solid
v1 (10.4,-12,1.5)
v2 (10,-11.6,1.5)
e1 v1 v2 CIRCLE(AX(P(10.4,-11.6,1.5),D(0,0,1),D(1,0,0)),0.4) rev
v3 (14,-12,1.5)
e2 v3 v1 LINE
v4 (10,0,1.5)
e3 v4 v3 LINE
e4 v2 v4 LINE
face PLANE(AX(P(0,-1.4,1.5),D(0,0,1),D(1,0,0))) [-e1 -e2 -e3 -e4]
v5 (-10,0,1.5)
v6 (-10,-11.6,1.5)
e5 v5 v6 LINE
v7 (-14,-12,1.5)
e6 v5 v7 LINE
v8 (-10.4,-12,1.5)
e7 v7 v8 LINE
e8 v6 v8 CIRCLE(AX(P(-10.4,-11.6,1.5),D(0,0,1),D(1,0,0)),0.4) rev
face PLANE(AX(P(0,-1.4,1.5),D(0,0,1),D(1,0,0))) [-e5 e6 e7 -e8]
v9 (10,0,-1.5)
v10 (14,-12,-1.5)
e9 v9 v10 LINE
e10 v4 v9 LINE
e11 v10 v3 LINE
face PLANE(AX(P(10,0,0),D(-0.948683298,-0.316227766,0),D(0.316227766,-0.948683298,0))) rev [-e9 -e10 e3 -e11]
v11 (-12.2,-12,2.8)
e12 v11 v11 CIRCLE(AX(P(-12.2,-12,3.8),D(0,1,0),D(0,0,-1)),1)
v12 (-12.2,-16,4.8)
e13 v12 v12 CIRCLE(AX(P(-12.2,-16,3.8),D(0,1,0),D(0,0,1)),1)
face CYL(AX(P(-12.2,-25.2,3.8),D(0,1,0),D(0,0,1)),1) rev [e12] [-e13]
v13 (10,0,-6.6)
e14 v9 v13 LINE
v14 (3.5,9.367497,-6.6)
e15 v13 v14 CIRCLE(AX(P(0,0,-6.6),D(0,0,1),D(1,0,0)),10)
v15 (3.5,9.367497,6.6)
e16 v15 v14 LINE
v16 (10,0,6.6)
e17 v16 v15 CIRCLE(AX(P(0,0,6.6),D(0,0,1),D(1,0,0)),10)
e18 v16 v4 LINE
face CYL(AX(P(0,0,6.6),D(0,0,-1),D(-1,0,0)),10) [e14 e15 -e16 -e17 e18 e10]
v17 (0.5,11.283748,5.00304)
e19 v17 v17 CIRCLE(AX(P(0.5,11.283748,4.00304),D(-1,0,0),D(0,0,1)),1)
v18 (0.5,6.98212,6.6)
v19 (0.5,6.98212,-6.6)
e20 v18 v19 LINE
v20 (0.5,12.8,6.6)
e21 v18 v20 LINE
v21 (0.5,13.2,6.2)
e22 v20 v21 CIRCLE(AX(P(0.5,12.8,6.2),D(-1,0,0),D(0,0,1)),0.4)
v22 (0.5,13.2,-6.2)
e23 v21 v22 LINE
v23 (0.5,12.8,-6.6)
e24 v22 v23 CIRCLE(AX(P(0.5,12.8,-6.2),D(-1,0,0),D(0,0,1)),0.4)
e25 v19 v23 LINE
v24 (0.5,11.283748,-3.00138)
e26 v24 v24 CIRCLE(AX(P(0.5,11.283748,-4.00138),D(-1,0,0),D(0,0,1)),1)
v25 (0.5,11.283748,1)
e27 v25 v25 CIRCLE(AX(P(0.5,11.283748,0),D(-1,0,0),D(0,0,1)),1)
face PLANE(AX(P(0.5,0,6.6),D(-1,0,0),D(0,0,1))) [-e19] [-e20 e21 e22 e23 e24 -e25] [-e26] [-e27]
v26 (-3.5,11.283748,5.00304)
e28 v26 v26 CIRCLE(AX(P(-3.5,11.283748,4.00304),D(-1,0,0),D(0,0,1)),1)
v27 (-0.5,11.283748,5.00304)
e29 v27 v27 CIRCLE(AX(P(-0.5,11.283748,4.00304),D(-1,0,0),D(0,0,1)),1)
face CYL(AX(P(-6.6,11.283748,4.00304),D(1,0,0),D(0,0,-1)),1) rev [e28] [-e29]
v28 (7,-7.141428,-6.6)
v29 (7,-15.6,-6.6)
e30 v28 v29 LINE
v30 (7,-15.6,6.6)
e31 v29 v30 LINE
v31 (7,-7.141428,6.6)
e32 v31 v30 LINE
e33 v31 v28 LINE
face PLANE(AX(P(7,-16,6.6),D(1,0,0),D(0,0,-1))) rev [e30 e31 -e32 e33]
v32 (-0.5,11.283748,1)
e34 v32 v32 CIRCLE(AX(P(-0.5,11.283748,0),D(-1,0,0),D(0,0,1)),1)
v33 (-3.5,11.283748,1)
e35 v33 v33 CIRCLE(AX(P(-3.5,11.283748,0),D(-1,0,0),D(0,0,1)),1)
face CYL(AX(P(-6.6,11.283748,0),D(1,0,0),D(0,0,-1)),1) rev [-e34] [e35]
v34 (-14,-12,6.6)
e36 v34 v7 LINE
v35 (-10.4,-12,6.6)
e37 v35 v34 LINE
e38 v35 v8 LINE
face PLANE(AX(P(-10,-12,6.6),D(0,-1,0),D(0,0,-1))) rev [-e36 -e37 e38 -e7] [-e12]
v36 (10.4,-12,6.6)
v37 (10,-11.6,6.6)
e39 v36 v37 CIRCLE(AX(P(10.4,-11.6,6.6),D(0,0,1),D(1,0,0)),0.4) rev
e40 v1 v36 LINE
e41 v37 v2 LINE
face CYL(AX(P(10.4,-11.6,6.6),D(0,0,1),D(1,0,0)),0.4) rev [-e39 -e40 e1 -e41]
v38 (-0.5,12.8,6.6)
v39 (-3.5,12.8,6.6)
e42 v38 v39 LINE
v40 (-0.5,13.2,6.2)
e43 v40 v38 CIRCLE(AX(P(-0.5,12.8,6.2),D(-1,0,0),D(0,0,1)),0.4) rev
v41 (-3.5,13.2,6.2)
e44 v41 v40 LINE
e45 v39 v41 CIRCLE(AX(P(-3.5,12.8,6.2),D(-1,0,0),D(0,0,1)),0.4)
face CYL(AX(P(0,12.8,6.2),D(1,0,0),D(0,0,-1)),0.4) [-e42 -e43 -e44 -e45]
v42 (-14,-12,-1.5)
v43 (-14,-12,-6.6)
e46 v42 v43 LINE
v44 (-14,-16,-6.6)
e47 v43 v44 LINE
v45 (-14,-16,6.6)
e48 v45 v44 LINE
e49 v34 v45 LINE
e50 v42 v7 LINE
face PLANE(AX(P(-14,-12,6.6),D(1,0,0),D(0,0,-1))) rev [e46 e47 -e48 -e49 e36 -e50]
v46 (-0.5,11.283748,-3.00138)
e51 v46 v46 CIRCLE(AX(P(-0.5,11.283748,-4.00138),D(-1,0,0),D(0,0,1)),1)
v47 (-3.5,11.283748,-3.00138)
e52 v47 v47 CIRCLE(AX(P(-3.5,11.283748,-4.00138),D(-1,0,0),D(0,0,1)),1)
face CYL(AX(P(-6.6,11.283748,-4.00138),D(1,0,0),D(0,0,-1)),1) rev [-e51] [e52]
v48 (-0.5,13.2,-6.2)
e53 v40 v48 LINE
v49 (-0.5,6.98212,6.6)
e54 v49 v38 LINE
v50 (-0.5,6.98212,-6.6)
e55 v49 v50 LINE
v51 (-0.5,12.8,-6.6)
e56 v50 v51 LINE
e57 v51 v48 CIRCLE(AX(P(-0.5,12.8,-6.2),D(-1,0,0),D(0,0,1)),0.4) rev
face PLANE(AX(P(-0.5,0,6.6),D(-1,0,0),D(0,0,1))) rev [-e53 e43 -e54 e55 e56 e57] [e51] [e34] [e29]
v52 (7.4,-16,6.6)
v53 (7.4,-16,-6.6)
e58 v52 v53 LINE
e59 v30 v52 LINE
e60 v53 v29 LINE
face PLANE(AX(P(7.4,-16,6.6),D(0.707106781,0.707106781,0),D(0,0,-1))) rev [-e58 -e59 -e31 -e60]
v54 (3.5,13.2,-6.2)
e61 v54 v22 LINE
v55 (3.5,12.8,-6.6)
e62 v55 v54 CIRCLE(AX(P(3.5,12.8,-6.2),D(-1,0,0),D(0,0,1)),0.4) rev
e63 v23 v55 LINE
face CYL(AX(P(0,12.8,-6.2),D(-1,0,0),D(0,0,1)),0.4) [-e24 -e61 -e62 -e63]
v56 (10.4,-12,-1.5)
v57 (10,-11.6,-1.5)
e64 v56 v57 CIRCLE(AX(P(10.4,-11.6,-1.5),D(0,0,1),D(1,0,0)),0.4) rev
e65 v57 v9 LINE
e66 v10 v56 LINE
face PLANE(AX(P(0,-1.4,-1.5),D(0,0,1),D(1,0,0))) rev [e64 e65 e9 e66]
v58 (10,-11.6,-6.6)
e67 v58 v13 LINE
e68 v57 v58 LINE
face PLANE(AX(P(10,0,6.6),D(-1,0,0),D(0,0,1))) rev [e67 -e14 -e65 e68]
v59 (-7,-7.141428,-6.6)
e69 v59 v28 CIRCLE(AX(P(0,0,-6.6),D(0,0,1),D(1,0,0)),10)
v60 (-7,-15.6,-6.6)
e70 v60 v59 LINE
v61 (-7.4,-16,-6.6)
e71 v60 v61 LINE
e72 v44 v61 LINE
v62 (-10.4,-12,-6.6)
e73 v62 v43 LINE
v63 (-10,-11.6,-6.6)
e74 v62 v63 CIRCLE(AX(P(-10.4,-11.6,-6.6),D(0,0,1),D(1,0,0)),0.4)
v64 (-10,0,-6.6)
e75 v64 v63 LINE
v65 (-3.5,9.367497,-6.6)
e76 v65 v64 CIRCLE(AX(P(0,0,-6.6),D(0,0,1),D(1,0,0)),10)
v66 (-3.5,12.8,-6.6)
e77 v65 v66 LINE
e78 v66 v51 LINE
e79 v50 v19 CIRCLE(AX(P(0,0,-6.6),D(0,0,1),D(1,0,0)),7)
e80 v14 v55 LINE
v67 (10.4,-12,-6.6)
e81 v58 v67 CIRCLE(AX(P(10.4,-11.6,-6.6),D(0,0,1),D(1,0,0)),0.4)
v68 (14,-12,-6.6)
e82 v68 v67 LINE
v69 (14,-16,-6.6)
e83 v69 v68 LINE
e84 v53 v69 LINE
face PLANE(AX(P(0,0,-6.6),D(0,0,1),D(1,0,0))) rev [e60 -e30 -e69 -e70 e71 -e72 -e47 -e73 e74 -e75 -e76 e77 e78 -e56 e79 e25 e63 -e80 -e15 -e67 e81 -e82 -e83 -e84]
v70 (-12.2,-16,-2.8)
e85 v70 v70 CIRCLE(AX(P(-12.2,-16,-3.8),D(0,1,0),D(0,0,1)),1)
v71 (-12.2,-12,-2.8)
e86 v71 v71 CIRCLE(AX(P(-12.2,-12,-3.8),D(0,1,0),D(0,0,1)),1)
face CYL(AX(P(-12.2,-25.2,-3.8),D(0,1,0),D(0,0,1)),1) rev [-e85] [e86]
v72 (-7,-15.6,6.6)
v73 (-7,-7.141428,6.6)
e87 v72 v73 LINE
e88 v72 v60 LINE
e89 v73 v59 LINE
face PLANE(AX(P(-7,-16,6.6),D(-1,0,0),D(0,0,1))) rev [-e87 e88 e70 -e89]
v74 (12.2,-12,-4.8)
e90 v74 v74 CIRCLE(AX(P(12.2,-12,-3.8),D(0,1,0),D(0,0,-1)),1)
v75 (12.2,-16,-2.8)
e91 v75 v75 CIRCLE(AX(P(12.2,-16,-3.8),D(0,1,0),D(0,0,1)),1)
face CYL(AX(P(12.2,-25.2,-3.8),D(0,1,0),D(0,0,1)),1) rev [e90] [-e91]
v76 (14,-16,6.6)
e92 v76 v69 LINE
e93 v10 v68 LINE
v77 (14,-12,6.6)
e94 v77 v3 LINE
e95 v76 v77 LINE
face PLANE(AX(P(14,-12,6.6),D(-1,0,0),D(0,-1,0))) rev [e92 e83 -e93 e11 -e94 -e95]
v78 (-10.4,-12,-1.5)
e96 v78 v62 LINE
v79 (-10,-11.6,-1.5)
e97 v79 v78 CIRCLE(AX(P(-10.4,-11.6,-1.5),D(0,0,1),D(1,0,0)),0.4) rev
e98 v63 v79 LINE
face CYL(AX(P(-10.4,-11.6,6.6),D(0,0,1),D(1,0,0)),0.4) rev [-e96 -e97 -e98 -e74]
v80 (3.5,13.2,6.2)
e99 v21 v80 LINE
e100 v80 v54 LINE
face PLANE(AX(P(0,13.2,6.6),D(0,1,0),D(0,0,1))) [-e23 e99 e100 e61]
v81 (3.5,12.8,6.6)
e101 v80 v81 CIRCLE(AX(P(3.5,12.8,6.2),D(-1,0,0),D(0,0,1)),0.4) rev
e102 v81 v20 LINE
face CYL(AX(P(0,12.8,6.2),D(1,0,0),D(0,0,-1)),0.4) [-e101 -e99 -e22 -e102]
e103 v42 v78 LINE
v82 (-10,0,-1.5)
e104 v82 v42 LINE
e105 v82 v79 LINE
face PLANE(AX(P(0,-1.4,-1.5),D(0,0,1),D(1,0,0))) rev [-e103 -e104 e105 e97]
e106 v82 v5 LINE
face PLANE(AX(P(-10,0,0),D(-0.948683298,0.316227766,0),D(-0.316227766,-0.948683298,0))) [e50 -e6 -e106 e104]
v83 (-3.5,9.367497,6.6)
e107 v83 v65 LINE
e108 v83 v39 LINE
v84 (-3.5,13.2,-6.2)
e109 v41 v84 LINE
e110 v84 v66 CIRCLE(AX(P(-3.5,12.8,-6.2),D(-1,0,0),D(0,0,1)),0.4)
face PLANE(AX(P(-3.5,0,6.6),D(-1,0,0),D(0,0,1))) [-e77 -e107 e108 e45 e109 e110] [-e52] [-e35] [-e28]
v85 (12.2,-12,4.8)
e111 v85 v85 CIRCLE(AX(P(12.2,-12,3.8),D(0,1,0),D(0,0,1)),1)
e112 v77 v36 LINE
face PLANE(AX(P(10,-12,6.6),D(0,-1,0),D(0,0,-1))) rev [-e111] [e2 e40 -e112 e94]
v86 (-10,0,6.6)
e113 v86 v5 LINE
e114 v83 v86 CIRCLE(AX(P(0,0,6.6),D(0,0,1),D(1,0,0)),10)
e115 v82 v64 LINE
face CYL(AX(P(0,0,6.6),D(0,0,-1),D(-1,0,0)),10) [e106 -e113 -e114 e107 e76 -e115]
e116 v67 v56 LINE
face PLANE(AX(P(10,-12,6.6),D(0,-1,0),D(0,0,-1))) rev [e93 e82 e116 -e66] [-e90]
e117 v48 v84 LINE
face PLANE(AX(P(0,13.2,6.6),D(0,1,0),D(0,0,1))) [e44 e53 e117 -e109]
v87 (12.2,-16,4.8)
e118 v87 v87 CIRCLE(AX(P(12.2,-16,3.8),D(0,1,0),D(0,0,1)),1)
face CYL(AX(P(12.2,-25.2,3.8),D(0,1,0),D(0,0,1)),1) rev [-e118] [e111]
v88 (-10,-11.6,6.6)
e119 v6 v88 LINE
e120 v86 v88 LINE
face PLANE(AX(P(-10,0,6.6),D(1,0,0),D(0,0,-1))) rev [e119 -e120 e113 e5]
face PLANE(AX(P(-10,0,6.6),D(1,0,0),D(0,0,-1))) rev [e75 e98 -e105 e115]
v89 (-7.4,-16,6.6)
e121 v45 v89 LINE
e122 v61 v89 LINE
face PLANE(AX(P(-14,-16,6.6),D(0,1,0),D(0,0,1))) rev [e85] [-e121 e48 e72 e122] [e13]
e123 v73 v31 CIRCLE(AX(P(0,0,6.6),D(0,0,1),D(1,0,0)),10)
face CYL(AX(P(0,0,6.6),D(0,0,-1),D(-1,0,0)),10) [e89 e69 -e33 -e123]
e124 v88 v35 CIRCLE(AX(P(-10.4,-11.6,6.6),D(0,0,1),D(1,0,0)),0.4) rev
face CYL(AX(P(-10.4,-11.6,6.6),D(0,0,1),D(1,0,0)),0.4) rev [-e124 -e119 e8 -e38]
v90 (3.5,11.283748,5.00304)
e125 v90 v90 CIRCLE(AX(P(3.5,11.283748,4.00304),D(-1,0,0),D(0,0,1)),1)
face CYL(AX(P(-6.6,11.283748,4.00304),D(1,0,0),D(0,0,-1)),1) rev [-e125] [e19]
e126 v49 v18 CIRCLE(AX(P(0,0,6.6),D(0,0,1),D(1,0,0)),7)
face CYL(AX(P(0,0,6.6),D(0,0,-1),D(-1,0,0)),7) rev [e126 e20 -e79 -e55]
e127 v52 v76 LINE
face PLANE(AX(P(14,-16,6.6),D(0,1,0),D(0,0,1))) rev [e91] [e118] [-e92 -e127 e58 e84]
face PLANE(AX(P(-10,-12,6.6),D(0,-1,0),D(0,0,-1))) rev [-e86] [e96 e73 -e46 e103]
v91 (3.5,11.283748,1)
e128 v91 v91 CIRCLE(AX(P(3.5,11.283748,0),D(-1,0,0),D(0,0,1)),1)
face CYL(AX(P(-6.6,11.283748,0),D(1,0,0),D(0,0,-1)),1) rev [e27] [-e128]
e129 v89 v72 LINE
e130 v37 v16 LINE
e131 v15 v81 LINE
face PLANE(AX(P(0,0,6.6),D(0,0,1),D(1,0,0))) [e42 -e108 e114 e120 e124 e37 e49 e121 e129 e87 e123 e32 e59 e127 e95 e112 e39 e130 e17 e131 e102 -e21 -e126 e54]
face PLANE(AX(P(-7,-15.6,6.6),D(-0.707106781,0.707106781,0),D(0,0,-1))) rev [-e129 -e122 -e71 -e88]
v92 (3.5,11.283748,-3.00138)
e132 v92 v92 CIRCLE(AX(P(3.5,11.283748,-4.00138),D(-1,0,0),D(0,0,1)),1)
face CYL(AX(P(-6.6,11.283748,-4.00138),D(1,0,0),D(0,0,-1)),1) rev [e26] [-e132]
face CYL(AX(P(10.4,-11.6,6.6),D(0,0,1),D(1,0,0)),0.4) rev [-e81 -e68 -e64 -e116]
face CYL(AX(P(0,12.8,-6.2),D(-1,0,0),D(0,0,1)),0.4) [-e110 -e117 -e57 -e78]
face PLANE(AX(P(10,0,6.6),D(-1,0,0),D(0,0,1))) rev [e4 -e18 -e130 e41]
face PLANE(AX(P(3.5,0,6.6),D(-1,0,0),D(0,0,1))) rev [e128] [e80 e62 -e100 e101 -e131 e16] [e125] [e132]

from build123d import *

# Parameters (mm, degrees)
BOSS_EXTRUDE1_DEPTH = 6.6
SKETCH3_R           = 1
CUT_EXTRUDE1_DEPTH  = 6.6
BOSS_EXTRUDE2_DEPTH = 6.6
CHAMFER1_SIZE       = 0.4
FILLET1_R           = 0.4
FILLET2_R           = 0.4
RIB17_START         = -1.5
RIB17_DEPTH         = 3
SKETCH25_R          = 1
CUT_EXTRUDE2_DEPTH  = 13.2


# Read off the part's stored shape, not the designer's step: Rib17
with BuildPart() as part:
    # Sketch1 → Boss-Extrude1 (new, symmetric)
    with BuildSketch(Plane.XY):
        with BuildLine():
            Line((-0.5, 13.2), (-3.5, 13.2))
            Line((-3.5, 13.2), (-3.5, 9.367496998))
            ThreePointArc((-3.5, 9.367496998), (0, -10), (3.5, 9.367496998))
            Line((3.5, 9.367496998), (3.5, 13.2))
            Line((3.5, 13.2), (0.5, 13.2))
            Line((0.5, 13.2), (0.5, 6.982120022))
            ThreePointArc((0.5, 6.982120022), (5.123475383, 4.769696007), (7, 0))
            ThreePointArc((7, 0), (-4.769696007, -5.123475383), (-0.5, 6.982120022))
            Line((-0.5, 6.982120022), (-0.5, 13.2))
        make_face()
    extrude(amount=BOSS_EXTRUDE1_DEPTH, both=True)

    # Sketch3 → Cut-Extrude1 (cut, symmetric)
    with BuildSketch(Plane(origin=(0, 0, 0), x_dir=(0, 0, -1), z_dir=(1, 0, 0))):
        with Locations(Location((0, 11.283748499, 0), (0, 0, 180))):
            Circle(SKETCH3_R)
        with Locations(Location((4.001379793, 11.283748499, 0), (0, 0, 180))):
            Circle(SKETCH3_R)
        with Locations(Location((-4.00303992, 11.283748499, 0), (0, 0, 180))):
            Circle(SKETCH3_R)
    extrude(amount=CUT_EXTRUDE1_DEPTH, both=True, mode=Mode.SUBTRACT)

    # Sketch4 → Boss-Extrude2 (add, symmetric)
    with BuildSketch(Plane.XY):
        with BuildLine():
            Line((-10, 0), (-10, -12))
            Line((-10, -12), (-14, -12))
            Line((-14, -12), (-14, -16))
            Line((-14, -16), (-7, -16))
            Line((-7, -16), (-7, -7.141428429))
            ThreePointArc((-7, -7.141428429), (-9.219544457, -3.872983346), (-10, 0))
        make_face()
        with BuildLine():
            Line((10, 0), (10, -12))
            Line((10, -12), (14, -12))
            Line((14, -12), (14, -16))
            Line((14, -16), (7, -16))
            Line((7, -16), (7, -7.141428429))
            ThreePointArc((7, -7.141428429), (9.219544457, -3.872983346), (10, 0))
        make_face()
    extrude(amount=BOSS_EXTRUDE2_DEPTH, both=True)

    # Chamfer1
    chamfer1_edges = [part.edges().sort_by_distance(p)[0] for p in [
        (-7, -16, 0),
        (7, -16, 0),
    ]]
    chamfer(chamfer1_edges, length=CHAMFER1_SIZE)

    # Fillet1
    fillet1_edges = [part.edges().sort_by_distance(p)[0] for p in [
        (-10, -12, 0),
        (10, -12, 0),
    ]]
    fillet(fillet1_edges, radius=FILLET1_R)

    # Fillet2
    fillet2_edges = [part.edges().sort_by_distance(p)[0] for p in [
        (2, 13.2, -6.6),
        (-2, 13.2, -6.6),
        (-2, 13.2, 6.6),
        (2, 13.2, 6.6),
    ]]
    fillet(fillet2_edges, radius=FILLET2_R)

    # Rib17 outline → Rib17 (add)
    with BuildSketch(Plane.XY.offset(RIB17_START)):
        with BuildLine():
            Line((14, -12), (10, 0))
            Line((10, 0), (10, -11.6))
            ThreePointArc((10, -11.6), (10.117157288, -11.882842712), (10.4, -12))
            Line((10.4, -12), (14, -12))
        make_face()
    rib17 = extrude(amount=RIB17_DEPTH)

    # Mirror1: Rib17 across plane
    add(rib17.mirror(Plane(origin=(0, 0, 0), x_dir=(0, 0, 1), z_dir=(1, 0, 0))))

    # Sketch25 → Cut-Extrude2 (cut)
    with BuildSketch(Plane(origin=(0, -12, 0), x_dir=(1, 0, 0), z_dir=(0, 1, 0))):
        with Locations(Location((-12.2, 3.8, 0), (0, 0, 270))):
            Circle(SKETCH25_R)
        with Locations(Location((-12.2, -3.8, 0), (0, 0, 270))):
            Circle(SKETCH25_R)
        with Locations(Location((12.2, 3.8, 0), (0, 0, 270))):
            Circle(SKETCH25_R)
        with Locations(Location((12.2, -3.8, 0), (0, 0, 270))):
            Circle(SKETCH25_R)
    extrude(amount=-CUT_EXTRUDE2_DEPTH, mode=Mode.SUBTRACT)


solid = part.part
